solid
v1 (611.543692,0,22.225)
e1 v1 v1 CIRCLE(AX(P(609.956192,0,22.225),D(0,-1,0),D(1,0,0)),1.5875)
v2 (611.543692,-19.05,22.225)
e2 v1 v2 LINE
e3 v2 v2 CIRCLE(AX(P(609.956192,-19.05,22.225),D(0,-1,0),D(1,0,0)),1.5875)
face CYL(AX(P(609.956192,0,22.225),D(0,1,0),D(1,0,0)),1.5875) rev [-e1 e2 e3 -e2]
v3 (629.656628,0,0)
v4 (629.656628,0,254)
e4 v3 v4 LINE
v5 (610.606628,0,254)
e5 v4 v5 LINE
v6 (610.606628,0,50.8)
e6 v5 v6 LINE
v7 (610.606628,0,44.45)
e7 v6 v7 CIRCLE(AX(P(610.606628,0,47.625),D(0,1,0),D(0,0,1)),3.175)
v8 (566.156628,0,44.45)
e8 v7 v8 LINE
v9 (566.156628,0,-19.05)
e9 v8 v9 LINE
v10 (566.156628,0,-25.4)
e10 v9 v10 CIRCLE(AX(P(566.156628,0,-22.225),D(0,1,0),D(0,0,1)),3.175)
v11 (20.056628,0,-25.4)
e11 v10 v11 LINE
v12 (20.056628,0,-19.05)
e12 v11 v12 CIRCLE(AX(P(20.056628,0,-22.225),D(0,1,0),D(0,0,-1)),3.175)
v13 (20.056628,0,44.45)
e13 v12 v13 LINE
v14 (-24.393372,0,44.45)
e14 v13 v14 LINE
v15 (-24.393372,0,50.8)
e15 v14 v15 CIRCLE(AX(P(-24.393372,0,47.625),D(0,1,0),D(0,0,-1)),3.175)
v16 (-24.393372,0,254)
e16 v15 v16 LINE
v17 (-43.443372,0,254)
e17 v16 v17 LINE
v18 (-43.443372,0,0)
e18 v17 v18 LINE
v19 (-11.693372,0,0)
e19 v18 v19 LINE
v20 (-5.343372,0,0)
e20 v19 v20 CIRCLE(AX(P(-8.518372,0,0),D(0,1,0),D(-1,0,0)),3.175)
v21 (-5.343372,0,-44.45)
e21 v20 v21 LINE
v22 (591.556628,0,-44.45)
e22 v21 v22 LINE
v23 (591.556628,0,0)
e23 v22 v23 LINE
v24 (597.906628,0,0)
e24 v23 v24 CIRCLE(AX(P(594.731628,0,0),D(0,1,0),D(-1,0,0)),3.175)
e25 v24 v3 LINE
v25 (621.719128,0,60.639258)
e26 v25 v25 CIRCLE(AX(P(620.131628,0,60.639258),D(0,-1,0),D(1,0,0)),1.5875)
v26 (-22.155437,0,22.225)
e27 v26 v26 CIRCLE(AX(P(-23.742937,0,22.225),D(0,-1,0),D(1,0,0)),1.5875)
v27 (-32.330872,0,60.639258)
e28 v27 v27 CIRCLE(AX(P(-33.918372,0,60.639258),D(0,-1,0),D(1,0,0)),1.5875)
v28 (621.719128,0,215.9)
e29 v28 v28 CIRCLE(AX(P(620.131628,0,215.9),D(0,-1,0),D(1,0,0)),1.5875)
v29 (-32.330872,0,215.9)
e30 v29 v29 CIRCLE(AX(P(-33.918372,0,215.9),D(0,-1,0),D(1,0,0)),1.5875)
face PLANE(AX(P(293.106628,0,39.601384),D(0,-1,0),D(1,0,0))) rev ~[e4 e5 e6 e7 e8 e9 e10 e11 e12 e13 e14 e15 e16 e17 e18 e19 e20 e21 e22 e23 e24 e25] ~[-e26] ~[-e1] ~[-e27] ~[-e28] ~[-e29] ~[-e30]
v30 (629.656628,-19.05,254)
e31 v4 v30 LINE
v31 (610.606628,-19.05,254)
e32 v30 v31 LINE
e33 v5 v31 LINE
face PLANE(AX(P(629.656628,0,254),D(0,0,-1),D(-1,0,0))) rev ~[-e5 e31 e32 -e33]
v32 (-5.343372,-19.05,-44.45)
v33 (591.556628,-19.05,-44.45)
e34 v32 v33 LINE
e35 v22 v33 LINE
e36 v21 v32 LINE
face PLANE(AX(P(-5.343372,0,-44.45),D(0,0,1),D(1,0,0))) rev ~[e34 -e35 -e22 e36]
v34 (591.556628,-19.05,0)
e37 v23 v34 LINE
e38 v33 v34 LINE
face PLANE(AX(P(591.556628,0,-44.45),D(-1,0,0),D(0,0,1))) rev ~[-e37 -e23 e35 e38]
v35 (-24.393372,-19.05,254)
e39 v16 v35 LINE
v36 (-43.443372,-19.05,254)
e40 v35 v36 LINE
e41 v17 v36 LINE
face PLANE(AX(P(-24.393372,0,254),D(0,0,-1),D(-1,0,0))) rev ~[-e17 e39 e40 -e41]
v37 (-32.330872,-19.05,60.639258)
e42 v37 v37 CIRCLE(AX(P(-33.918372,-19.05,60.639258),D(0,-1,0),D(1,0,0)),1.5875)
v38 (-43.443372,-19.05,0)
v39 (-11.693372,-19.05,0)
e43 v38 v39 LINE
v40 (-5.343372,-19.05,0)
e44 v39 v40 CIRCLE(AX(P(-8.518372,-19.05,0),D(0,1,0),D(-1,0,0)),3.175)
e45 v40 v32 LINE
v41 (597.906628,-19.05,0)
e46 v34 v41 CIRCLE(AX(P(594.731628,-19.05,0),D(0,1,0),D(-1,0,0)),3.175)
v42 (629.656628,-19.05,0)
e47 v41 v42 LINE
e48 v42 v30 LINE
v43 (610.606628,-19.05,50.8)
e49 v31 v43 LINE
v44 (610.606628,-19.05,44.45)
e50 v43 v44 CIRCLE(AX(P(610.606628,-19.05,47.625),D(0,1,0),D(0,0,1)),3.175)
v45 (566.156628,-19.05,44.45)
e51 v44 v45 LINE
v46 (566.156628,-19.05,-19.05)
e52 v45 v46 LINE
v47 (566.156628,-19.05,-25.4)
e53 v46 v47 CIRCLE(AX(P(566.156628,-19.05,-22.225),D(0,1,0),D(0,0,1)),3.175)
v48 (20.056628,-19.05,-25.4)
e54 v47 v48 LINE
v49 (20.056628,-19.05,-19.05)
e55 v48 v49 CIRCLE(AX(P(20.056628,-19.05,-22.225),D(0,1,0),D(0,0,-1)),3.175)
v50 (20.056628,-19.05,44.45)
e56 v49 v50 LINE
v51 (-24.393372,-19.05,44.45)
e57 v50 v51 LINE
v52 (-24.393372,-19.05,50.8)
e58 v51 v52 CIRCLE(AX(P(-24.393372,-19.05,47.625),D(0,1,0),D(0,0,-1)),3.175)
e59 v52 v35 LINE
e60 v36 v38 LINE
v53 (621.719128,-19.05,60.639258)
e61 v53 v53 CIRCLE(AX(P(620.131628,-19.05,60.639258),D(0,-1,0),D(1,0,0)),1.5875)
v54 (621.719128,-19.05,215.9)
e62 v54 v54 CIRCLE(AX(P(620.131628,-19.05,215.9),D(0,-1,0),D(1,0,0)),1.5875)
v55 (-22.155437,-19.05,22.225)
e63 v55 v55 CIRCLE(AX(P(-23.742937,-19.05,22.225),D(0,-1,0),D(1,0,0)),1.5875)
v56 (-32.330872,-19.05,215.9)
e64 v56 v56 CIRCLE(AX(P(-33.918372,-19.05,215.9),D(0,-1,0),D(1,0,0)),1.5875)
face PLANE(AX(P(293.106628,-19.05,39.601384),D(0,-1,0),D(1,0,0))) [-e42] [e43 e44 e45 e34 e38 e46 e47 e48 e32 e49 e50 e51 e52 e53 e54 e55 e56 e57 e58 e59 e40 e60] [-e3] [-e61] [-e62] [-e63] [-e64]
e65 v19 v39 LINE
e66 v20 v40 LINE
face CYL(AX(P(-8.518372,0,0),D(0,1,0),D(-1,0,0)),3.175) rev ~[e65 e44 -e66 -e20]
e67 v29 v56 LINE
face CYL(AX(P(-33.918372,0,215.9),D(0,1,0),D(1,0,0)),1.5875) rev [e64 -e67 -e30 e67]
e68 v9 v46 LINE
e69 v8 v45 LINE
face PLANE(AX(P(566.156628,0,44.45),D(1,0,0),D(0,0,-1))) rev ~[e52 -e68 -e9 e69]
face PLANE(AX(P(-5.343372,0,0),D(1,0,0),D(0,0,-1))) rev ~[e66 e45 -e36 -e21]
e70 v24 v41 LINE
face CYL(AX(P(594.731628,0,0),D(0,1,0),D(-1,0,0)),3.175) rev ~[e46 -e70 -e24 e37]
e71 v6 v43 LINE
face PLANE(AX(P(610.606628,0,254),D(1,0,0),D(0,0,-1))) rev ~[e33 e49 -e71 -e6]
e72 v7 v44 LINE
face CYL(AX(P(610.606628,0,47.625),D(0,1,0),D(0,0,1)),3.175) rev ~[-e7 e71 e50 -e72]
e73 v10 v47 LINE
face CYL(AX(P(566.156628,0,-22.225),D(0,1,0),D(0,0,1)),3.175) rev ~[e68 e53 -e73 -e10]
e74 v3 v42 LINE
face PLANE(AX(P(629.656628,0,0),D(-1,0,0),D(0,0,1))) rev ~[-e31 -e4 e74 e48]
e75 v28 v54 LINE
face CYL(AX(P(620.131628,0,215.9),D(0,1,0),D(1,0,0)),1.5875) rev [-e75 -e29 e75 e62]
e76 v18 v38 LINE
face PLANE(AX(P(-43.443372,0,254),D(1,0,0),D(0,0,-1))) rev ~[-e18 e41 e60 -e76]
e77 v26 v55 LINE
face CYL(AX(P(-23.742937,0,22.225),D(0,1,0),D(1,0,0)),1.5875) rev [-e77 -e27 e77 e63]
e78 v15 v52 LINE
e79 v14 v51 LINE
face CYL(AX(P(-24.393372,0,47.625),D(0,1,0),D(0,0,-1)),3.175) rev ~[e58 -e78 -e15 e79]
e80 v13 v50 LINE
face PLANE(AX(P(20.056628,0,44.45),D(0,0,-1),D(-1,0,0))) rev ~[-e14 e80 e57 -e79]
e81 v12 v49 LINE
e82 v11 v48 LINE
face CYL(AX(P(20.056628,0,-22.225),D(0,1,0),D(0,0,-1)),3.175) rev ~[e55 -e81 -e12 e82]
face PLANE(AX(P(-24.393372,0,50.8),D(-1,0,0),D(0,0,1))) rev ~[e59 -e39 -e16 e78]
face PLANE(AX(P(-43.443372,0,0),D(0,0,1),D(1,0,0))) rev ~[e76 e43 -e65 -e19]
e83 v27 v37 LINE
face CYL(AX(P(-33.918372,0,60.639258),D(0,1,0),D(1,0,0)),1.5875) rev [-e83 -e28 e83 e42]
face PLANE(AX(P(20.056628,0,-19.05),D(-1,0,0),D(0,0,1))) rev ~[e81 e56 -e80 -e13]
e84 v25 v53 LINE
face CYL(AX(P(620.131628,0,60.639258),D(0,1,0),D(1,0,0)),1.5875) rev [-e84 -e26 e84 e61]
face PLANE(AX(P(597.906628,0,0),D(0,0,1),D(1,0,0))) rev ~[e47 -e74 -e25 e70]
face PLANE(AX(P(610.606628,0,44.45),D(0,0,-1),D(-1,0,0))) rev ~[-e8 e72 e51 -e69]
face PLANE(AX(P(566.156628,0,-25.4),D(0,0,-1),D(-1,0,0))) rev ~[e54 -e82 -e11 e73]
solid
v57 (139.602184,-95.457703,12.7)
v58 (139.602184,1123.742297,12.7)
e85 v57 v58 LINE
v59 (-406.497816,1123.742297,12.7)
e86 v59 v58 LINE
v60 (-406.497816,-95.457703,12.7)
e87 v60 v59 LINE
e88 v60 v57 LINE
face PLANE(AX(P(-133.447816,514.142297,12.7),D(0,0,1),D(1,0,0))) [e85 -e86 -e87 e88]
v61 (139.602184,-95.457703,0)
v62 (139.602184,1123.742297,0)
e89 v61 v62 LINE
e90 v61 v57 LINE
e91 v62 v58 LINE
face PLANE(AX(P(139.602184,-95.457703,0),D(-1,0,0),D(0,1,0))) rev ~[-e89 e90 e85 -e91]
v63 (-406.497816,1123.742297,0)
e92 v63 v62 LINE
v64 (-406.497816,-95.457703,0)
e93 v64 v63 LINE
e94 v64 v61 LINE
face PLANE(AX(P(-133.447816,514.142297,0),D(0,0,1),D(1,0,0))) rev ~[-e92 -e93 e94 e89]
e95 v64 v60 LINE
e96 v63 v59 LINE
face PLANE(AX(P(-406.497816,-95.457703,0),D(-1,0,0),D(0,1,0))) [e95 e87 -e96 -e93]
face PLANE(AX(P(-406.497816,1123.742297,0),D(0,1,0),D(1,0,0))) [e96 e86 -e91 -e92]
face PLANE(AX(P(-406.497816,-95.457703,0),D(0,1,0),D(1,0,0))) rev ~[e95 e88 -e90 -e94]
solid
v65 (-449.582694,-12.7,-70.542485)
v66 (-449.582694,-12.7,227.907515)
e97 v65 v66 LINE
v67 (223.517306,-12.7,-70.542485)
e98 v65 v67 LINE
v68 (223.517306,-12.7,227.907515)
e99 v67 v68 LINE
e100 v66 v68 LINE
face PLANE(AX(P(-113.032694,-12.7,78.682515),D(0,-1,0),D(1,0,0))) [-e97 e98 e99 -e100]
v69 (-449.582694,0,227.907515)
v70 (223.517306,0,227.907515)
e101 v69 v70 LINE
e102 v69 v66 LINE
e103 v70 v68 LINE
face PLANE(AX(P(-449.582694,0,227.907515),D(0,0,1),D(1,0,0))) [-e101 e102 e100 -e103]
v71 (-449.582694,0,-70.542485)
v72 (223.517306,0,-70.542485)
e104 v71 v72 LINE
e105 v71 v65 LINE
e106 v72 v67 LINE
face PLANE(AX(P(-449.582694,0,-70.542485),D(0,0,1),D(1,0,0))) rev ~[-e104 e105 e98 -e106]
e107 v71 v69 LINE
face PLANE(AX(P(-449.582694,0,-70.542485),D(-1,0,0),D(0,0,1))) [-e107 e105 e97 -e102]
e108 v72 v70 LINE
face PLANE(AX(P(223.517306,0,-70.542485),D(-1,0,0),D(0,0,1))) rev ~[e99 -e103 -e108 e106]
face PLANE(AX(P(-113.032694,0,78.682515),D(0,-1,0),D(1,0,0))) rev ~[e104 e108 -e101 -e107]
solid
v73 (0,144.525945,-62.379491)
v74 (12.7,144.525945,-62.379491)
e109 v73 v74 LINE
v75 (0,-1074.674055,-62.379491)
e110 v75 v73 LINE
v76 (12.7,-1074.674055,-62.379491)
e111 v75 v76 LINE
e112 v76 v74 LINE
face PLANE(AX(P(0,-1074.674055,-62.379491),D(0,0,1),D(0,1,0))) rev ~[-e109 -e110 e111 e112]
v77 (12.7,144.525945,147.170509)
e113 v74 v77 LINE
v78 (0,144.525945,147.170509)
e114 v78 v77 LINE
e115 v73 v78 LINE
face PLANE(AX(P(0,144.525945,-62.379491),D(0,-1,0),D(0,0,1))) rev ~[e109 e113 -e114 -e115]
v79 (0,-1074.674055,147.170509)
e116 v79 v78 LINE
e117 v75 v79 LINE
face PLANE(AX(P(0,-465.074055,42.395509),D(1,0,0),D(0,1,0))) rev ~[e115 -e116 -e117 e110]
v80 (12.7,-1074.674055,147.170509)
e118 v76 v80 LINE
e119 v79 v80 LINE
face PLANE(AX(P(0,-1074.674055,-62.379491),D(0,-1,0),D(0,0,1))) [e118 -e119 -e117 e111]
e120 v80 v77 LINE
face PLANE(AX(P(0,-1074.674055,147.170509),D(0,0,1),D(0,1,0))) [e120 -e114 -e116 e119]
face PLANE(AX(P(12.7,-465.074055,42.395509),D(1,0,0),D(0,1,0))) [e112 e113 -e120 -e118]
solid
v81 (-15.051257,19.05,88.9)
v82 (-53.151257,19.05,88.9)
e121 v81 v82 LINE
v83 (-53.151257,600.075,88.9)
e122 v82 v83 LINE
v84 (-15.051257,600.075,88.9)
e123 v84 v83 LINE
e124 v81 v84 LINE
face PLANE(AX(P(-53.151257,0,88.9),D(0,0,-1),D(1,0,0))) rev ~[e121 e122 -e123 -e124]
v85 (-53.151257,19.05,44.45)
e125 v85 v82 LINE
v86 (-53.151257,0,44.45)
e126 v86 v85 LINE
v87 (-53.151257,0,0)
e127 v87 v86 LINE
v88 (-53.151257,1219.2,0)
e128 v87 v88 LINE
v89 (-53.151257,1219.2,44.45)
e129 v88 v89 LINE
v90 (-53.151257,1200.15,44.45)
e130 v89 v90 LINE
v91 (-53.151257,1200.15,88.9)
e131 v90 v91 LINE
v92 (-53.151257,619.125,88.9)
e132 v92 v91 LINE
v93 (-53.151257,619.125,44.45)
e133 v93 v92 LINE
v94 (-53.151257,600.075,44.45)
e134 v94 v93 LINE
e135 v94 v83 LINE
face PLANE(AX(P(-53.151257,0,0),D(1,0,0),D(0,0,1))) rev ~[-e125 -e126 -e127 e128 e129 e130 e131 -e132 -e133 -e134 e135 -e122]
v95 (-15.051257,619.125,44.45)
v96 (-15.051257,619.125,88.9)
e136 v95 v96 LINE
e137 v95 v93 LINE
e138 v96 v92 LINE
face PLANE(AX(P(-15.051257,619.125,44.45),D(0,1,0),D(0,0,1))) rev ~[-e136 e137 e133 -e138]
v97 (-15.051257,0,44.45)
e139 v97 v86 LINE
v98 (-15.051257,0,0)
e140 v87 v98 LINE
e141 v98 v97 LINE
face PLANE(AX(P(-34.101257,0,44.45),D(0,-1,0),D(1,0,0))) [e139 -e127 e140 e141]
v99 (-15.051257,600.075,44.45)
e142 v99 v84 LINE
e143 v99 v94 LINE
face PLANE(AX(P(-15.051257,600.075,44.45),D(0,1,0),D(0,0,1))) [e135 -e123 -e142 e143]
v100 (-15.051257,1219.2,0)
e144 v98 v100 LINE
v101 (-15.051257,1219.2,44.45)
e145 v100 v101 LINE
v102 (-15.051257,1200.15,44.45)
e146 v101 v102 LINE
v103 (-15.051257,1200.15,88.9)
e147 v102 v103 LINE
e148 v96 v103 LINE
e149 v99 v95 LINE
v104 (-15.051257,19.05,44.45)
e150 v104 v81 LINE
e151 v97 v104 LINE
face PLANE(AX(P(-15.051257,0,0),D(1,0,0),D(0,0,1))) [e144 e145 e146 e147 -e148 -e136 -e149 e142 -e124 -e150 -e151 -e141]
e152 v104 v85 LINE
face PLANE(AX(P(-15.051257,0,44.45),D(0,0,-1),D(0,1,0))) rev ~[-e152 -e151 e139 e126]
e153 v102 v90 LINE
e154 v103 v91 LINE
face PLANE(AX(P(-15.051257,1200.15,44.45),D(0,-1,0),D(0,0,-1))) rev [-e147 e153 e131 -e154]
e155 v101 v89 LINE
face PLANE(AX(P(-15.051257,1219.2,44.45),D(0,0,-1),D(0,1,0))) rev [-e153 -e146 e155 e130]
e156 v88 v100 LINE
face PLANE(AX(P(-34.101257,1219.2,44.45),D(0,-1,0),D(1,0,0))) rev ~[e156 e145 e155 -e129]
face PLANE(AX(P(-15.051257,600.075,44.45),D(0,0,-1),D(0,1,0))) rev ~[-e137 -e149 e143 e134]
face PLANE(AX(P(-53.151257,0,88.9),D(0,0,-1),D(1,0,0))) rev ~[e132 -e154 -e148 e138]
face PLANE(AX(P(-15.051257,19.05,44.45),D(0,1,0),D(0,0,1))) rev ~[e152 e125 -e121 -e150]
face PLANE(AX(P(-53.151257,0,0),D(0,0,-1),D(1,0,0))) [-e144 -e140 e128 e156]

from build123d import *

# Parameters (mm, degrees)
F0_R      = 1.5875
F1_DEPTH  = 19.05
F2_W      = 38.1
F2_H      = 88.9
F3_DEPTH  = 1219.2
F4_W      = 19.05
F4_H      = 44.45
F5_DEPTH  = 50.8
F7_W      = 19.05
F7_H      = 44.45
F8_DEPTH  = 50.8
F9_W      = 673.1
F9_H      = 298.45
F10_DEPTH = 12.7
F11_W     = 1219.2
F11_H     = 209.55
F12_DEPTH = 12.7
F13_W     = 546.1
F13_H     = 1219.2
F14_DEPTH = 12.7


# Not quite as in the source:
# - a pattern or mirror of a feature is missing from the dataset's text; its kind, count and spacing are read off the source's solid


with BuildPart() as f1:
    # F0 (on Front) → F1 (new body)
    with BuildSketch(Plane.XZ):
        with BuildLine():
            Line((-5.3433722377, 44.45), (-24.3933722377, 44.45))
            ThreePointArc((-24.3933722377, 44.45), (-27.5683722377, 47.625), (-24.3933722377, 50.8))
            Line((-24.3933722377, 50.8), (-24.3933722377, 254))
            Line((-24.3933722377, 254), (-43.4433722377, 254))
            Line((-43.4433722377, 254), (-43.4433722377, 44.45))
            Line((-43.4433722377, 44.45), (-43.4433722377, 0))
            Line((-43.4433722377, 0), (-11.6933722377, 0))
            ThreePointArc((-11.6933722377, 0), (-8.5183722377, 3.175), (-5.3433722377, 0))
            Line((-5.3433722377, 0), (-5.3433722377, -44.45))
            Line((-5.3433722377, -44.45), (293.1066277623, -44.45))
            Line((293.1066277623, -44.45), (591.5566277623, -44.45))
            Line((591.5566277623, -44.45), (591.5566277623, 0))
            ThreePointArc((591.5566277623, 0), (594.7316277623, 3.175), (597.9066277623, 0))
            Line((597.9066277623, 0), (629.6566277623, 0))
            Line((629.6566277623, 0), (629.6566277623, 44.45))
            Line((629.6566277623, 44.45), (629.6566277623, 254))
            Line((629.6566277623, 254), (610.6066277623, 254))
            Line((610.6066277623, 254), (610.6066277623, 50.8))
            ThreePointArc((610.6066277623, 50.8), (613.7816277623, 47.625), (610.6066277623, 44.45))
            Line((610.6066277623, 44.45), (591.5566277623, 44.45))
            Line((591.5566277623, 44.45), (566.1566277623, 44.45))
            Line((566.1566277623, 44.45), (566.1566277623, -19.05))
            ThreePointArc((566.1566277623, -19.05), (569.3316277623, -22.225), (566.1566277623, -25.4))
            Line((566.1566277623, -25.4), (293.1066277623, -25.4))
            Line((293.1066277623, -25.4), (20.0566277623, -25.4))
            ThreePointArc((20.0566277623, -25.4), (16.8816277623, -22.225), (20.0566277623, -19.05))
            Line((20.0566277623, -19.05), (20.0566277623, 44.45))
            Line((20.0566277623, 44.45), (-5.3433722377, 44.45))
        make_face()
        with Locations((-23.7429365516, 22.225)):
            Circle(F0_R, mode=Mode.SUBTRACT)
        with Locations((-33.9183722377, 60.6392584741)):
            Circle(F0_R, mode=Mode.SUBTRACT)
        with Locations((609.9561920762, 22.225)):
            Circle(F0_R, mode=Mode.SUBTRACT)
        with Locations((620.1316277623, 60.6392584741)):
            Circle(F0_R, mode=Mode.SUBTRACT)
        with Locations((-33.9183722377, 215.9)):
            Circle(F0_R, mode=Mode.SUBTRACT)
        with Locations((620.1316277623, 215.9)):
            Circle(F0_R, mode=Mode.SUBTRACT)
    extrude(amount=F1_DEPTH)


with BuildPart() as f3:
    # F2 (on Front) → F3 (new body)
    with BuildSketch(Plane.XZ):
        with Locations((-34.1012573361, 44.45)):
            Rectangle(F2_W, F2_H)
    extrude(amount=-F3_DEPTH)

    # F4 (on face) → F5 (cut)
    with BuildSketch(Plane.YZ.offset(-15.0512573361)):
        with Locations((9.525, 66.675)):
            Rectangle(F4_W, F4_H)
    f5 = extrude(amount=-F5_DEPTH, mode=Mode.SUBTRACT)

    # F5_copies: F5 across plane
    add(f5.mirror(Plane.ZX.offset(609.6)), mode=Mode.SUBTRACT)

    # F7 (on face) → F8 (cut)
    with BuildSketch(Plane.YZ.offset(-15.0512573361)):
        with Locations((609.6, 66.675)):
            Rectangle(F7_W, F7_H)
    extrude(amount=-F8_DEPTH, mode=Mode.SUBTRACT)


with BuildPart() as f10:
    # F9 (on Front) → F10 (new body)
    with BuildSketch(Plane.XZ):
        with Locations((-113.032694068, 78.6825154781)):
            Rectangle(F9_W, F9_H)
    extrude(amount=F10_DEPTH)


with BuildPart() as f12:
    # F11 (on Right) → F12 (new body)
    with BuildSketch(Plane.YZ):
        with Locations((-465.0740548134, 42.3955094159)):
            Rectangle(F11_W, F11_H)
    extrude(amount=F12_DEPTH)


with BuildPart() as f14:
    # F13 (on Top) → F14 (new body)
    with BuildSketch(Plane.XY):
        with Locations((-133.4478157043, 514.1422971249)):
            Rectangle(F13_W, F13_H)
    extrude(amount=F14_DEPTH)


solid = Compound([f1.part, f3.part, f10.part, f12.part, f14.part])
